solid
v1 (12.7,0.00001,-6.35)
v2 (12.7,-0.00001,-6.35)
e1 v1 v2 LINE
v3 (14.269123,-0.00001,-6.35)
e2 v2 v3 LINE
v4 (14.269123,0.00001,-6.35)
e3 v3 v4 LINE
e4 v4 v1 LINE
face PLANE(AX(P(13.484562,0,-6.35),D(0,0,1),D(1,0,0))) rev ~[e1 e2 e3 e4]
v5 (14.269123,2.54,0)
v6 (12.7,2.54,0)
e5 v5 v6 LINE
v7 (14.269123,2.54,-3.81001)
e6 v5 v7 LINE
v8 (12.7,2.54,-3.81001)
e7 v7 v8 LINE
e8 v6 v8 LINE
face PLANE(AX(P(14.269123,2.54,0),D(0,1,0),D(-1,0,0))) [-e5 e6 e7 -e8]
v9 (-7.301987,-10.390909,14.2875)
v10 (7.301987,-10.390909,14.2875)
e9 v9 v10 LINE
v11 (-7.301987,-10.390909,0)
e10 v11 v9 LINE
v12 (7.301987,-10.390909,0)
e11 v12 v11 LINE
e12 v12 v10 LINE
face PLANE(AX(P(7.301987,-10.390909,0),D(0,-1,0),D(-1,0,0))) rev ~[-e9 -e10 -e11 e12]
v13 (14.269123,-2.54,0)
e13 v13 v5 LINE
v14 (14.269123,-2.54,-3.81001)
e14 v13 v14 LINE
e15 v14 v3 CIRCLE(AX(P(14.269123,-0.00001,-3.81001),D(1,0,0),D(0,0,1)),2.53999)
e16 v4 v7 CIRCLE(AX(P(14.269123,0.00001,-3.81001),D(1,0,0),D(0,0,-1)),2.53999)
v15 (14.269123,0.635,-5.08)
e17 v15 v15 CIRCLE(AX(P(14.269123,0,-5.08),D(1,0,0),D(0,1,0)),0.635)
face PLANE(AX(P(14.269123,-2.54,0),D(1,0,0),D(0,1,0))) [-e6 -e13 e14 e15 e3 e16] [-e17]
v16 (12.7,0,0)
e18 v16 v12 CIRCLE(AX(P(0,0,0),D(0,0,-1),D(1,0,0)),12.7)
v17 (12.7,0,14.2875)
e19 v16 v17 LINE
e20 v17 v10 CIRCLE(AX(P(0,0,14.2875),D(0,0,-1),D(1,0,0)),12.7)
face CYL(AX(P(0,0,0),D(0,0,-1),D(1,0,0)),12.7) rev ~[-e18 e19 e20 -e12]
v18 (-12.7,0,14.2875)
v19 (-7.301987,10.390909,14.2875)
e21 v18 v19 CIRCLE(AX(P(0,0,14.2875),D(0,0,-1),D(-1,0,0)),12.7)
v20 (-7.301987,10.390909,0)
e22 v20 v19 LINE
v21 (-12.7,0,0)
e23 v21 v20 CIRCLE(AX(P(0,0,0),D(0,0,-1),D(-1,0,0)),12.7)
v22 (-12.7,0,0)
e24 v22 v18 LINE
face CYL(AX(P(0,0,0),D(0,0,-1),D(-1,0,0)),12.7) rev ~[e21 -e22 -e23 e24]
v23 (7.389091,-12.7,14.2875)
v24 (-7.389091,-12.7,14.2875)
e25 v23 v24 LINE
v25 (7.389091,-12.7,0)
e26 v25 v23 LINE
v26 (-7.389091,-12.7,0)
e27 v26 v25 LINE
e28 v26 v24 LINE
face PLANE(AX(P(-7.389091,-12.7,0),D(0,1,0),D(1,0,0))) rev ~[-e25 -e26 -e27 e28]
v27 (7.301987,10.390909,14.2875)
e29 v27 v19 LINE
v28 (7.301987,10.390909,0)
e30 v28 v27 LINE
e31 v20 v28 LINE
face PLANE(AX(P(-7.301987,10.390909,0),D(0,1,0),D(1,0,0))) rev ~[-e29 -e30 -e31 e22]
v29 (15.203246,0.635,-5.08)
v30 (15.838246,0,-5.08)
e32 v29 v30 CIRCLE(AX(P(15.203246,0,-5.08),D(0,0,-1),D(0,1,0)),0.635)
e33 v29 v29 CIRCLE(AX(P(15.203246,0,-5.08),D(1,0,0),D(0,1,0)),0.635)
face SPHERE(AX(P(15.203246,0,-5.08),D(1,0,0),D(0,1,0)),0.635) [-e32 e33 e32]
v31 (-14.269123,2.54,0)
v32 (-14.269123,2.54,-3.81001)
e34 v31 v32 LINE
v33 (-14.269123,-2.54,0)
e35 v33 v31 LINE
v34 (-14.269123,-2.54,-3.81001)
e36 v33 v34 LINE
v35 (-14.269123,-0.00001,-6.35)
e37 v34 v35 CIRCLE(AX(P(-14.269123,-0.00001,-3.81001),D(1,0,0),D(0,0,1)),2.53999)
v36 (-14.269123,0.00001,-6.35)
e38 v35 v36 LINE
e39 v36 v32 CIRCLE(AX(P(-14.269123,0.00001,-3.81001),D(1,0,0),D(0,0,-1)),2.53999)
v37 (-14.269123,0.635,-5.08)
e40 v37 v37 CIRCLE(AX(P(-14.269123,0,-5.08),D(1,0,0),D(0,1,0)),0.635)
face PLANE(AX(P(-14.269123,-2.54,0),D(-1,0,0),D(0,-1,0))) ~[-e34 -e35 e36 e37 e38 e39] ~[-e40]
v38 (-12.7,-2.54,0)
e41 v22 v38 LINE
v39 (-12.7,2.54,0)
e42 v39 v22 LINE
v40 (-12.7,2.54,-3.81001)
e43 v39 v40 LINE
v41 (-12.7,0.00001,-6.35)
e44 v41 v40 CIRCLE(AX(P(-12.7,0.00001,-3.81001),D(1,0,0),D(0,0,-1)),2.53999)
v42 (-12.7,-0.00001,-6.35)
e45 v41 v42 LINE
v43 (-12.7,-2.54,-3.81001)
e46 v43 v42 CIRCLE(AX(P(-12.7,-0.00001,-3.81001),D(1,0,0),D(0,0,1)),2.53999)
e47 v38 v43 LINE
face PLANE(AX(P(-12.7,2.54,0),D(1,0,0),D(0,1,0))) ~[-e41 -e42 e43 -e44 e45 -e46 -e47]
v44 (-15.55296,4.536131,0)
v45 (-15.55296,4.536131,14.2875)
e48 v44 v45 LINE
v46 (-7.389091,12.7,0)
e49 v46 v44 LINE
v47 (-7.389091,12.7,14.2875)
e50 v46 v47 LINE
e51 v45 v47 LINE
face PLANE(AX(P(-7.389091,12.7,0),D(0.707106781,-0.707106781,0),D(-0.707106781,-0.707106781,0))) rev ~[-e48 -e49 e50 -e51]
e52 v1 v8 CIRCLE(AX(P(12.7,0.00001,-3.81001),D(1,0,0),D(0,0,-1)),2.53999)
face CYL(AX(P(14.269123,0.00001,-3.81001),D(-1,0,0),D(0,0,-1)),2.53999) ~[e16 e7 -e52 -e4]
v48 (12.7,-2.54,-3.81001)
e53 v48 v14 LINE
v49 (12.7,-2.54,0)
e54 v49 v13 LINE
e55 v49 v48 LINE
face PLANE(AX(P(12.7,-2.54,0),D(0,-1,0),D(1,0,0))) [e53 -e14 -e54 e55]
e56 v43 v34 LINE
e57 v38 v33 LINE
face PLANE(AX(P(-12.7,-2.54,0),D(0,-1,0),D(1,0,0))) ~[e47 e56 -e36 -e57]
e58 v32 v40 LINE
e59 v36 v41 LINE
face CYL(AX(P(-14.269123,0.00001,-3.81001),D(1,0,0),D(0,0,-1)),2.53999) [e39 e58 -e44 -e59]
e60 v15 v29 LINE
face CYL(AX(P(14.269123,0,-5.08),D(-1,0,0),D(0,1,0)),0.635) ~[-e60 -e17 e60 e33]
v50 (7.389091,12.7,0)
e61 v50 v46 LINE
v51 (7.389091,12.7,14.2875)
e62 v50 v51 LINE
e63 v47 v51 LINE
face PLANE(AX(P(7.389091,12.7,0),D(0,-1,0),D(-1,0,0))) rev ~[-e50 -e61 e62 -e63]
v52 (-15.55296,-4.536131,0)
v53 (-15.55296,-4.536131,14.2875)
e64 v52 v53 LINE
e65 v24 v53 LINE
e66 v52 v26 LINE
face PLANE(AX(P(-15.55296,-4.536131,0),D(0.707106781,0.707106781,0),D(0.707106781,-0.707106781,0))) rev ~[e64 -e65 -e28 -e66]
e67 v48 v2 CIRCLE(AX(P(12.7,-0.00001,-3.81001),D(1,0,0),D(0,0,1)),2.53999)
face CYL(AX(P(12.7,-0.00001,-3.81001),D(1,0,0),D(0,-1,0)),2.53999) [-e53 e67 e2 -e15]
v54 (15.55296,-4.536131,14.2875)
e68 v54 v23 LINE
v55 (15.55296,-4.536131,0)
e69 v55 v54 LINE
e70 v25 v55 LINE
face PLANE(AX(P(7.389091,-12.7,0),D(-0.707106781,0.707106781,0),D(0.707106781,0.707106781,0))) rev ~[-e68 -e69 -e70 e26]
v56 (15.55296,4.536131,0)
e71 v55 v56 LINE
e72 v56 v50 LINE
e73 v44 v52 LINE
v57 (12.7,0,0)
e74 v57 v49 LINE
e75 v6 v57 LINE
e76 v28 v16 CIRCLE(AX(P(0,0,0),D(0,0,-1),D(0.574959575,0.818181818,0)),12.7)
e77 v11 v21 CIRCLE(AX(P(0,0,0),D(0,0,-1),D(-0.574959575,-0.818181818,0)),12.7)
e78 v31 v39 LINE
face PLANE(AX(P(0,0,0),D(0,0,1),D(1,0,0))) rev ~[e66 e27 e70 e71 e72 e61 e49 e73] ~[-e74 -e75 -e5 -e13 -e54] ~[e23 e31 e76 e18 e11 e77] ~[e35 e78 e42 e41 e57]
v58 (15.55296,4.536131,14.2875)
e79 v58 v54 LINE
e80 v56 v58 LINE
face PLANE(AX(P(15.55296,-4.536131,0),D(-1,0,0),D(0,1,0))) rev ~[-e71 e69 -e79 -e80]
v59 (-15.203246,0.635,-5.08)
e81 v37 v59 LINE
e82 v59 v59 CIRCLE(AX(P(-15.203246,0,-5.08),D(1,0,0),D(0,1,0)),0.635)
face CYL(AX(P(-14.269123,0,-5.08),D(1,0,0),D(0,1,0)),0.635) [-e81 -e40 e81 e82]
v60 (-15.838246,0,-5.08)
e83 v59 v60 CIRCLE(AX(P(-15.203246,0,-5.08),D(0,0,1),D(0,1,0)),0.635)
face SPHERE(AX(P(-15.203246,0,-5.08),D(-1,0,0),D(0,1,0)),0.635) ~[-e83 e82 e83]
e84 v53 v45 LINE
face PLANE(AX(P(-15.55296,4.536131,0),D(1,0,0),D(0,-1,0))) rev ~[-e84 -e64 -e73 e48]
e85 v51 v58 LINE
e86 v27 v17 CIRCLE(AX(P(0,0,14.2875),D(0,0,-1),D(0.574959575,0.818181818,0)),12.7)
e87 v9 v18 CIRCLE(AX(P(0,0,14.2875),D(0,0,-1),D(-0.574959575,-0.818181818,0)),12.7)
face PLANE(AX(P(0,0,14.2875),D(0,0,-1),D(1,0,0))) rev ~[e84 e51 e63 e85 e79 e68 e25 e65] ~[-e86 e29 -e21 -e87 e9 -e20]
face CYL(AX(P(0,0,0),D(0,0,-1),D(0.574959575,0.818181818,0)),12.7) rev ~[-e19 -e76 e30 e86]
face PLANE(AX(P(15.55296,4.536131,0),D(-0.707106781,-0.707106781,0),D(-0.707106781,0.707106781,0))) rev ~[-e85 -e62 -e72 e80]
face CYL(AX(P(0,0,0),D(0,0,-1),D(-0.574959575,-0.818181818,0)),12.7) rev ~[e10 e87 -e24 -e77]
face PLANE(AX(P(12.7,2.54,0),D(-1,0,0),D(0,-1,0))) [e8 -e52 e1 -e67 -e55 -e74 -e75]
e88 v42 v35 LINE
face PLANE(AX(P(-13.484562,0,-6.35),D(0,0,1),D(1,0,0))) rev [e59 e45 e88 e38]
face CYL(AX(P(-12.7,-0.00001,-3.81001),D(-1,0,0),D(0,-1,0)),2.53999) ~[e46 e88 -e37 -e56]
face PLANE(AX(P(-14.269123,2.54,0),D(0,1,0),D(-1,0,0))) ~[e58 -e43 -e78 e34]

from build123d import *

# Parameters (mm, degrees)
F1_DEPTH  = 28.575
F3_DEPTH  = 6.35
F4_R      = 0.635
F5_DEPTH  = 1.5691231
F6_R      = 2.53999
F7_R      = 0.635
F9_DEPTH  = 6.35
F11_D     = 2.54
F16_D     = 127
F16_DEPTH = 20.6385


# Not quite as in the source:
# - a fillet or chamfer is up to 0.001 mm smaller than in the source, because OpenCascade refuses the exact size
# - a length typed as a fraction of an inch, garbled in the dataset ("3 / 203.2 mm" for 3/8 in), is restored
# - the program builds the solid bodies; features that only make, move or delete a surface that nothing else refers to are left out


with BuildPart() as f1:
    # F0 (on Top) → F1 (new body)
    with BuildSketch(Plane.XY):
        Polygon((7.3890909091, 12.7), (0, 12.7), (-7.3890909091, 12.7), (-15.5529601101, 4.536130799), (-15.5529601101, 0), (-15.5529601101, -4.536130799), (-7.3890909091, -12.7), (0, -12.7), (7.3890909091, -12.7), (15.5529601101, -4.536130799), (15.5529601101, 0), (15.5529601101, 4.536130799), align=None)
        with BuildLine():
            ThreePointArc((7.3019865971, 10.3909090909), (11.269987351, 5.8546891556), (12.7, 0))
            ThreePointArc((12.7, 0), (11.269987351, -5.8546891556), (7.3019865971, -10.3909090909))
            Line((7.3019865971, -10.3909090909), (0, -10.3909090909))
            Line((0, -10.3909090909), (-7.3019865971, -10.3909090909))
            ThreePointArc((-7.3019865971, -10.3909090909), (-11.269987351, -5.8546891556), (-12.7, 0))
            ThreePointArc((-12.7, 0), (-11.269987351, 5.8546891556), (-7.3019865971, 10.3909090909))
            Line((-7.3019865971, 10.3909090909), (0, 10.3909090909))
            Line((0, 10.3909090909), (7.3019865971, 10.3909090909))
        make_face(mode=Mode.SUBTRACT)
    extrude(amount=F1_DEPTH)

    # F2 (on Top) → F3 (join)
    with BuildSketch(Plane.XY):
        Polygon((14.2691231, -2.54), (14.2691231, 0), (14.2691231, 2.54), (12.7, 2.54), (12.7, 0), (12.7, -2.54), align=None)
    extrude(amount=-F3_DEPTH)

    # F4 (on face) → F5 (join)
    with BuildSketch(Plane.YZ.offset(14.2691231)):
        with Locations((0, -5.08)):
            Circle(F4_R)
    extrude(amount=F5_DEPTH)

    # F6 (radius 2.54 in the source; OpenCascade refuses exactly that, so slightly less here)
    f6_edges = [f1.edges().sort_by_distance(p)[0] for p in [
        (13.484562, -2.54, -6.35),
        (13.484562, 2.54, -6.35),
    ]]
    fillet(f6_edges, radius=F6_R)

    # F7
    f7_edges = [f1.edges().sort_by_distance(p)[0] for p in [
        (15.838246, -0.635, -5.08),
    ]]
    fillet(f7_edges, radius=F7_R)

    # F8 (on face) → F9 (join)
    with BuildSketch(Plane.XY.offset(28.575)):
        Polygon((15.5529601101, 2.54), (13.9838320495, 2.54), (13.9838320495, 0), (13.9838320495, -2.54), (15.5529601101, -2.54), (15.5529601101, 0), align=None)
    extrude(amount=F9_DEPTH)

    # F11 (through all)
    with Locations(Plane.YZ.offset(15.5529601101)):
        with Locations((0, 32.385)):
            Hole(F11_D / 2)

    # F12: F1 across plane


with BuildPart() as f1_1:
    add(f1.part)
    add(f1.part.mirror(Plane.YZ))

    # F16 (through all, one way)
    with BuildSketch(Plane(origin=(0, 0, 14.2875), x_dir=(1, 0, 0), z_dir=(0, 0, -1))):
        with Locations((0, 0)):
            Circle(F16_D / 2)
    extrude(amount=-F16_DEPTH, mode=Mode.SUBTRACT)


solid = f1_1.part
